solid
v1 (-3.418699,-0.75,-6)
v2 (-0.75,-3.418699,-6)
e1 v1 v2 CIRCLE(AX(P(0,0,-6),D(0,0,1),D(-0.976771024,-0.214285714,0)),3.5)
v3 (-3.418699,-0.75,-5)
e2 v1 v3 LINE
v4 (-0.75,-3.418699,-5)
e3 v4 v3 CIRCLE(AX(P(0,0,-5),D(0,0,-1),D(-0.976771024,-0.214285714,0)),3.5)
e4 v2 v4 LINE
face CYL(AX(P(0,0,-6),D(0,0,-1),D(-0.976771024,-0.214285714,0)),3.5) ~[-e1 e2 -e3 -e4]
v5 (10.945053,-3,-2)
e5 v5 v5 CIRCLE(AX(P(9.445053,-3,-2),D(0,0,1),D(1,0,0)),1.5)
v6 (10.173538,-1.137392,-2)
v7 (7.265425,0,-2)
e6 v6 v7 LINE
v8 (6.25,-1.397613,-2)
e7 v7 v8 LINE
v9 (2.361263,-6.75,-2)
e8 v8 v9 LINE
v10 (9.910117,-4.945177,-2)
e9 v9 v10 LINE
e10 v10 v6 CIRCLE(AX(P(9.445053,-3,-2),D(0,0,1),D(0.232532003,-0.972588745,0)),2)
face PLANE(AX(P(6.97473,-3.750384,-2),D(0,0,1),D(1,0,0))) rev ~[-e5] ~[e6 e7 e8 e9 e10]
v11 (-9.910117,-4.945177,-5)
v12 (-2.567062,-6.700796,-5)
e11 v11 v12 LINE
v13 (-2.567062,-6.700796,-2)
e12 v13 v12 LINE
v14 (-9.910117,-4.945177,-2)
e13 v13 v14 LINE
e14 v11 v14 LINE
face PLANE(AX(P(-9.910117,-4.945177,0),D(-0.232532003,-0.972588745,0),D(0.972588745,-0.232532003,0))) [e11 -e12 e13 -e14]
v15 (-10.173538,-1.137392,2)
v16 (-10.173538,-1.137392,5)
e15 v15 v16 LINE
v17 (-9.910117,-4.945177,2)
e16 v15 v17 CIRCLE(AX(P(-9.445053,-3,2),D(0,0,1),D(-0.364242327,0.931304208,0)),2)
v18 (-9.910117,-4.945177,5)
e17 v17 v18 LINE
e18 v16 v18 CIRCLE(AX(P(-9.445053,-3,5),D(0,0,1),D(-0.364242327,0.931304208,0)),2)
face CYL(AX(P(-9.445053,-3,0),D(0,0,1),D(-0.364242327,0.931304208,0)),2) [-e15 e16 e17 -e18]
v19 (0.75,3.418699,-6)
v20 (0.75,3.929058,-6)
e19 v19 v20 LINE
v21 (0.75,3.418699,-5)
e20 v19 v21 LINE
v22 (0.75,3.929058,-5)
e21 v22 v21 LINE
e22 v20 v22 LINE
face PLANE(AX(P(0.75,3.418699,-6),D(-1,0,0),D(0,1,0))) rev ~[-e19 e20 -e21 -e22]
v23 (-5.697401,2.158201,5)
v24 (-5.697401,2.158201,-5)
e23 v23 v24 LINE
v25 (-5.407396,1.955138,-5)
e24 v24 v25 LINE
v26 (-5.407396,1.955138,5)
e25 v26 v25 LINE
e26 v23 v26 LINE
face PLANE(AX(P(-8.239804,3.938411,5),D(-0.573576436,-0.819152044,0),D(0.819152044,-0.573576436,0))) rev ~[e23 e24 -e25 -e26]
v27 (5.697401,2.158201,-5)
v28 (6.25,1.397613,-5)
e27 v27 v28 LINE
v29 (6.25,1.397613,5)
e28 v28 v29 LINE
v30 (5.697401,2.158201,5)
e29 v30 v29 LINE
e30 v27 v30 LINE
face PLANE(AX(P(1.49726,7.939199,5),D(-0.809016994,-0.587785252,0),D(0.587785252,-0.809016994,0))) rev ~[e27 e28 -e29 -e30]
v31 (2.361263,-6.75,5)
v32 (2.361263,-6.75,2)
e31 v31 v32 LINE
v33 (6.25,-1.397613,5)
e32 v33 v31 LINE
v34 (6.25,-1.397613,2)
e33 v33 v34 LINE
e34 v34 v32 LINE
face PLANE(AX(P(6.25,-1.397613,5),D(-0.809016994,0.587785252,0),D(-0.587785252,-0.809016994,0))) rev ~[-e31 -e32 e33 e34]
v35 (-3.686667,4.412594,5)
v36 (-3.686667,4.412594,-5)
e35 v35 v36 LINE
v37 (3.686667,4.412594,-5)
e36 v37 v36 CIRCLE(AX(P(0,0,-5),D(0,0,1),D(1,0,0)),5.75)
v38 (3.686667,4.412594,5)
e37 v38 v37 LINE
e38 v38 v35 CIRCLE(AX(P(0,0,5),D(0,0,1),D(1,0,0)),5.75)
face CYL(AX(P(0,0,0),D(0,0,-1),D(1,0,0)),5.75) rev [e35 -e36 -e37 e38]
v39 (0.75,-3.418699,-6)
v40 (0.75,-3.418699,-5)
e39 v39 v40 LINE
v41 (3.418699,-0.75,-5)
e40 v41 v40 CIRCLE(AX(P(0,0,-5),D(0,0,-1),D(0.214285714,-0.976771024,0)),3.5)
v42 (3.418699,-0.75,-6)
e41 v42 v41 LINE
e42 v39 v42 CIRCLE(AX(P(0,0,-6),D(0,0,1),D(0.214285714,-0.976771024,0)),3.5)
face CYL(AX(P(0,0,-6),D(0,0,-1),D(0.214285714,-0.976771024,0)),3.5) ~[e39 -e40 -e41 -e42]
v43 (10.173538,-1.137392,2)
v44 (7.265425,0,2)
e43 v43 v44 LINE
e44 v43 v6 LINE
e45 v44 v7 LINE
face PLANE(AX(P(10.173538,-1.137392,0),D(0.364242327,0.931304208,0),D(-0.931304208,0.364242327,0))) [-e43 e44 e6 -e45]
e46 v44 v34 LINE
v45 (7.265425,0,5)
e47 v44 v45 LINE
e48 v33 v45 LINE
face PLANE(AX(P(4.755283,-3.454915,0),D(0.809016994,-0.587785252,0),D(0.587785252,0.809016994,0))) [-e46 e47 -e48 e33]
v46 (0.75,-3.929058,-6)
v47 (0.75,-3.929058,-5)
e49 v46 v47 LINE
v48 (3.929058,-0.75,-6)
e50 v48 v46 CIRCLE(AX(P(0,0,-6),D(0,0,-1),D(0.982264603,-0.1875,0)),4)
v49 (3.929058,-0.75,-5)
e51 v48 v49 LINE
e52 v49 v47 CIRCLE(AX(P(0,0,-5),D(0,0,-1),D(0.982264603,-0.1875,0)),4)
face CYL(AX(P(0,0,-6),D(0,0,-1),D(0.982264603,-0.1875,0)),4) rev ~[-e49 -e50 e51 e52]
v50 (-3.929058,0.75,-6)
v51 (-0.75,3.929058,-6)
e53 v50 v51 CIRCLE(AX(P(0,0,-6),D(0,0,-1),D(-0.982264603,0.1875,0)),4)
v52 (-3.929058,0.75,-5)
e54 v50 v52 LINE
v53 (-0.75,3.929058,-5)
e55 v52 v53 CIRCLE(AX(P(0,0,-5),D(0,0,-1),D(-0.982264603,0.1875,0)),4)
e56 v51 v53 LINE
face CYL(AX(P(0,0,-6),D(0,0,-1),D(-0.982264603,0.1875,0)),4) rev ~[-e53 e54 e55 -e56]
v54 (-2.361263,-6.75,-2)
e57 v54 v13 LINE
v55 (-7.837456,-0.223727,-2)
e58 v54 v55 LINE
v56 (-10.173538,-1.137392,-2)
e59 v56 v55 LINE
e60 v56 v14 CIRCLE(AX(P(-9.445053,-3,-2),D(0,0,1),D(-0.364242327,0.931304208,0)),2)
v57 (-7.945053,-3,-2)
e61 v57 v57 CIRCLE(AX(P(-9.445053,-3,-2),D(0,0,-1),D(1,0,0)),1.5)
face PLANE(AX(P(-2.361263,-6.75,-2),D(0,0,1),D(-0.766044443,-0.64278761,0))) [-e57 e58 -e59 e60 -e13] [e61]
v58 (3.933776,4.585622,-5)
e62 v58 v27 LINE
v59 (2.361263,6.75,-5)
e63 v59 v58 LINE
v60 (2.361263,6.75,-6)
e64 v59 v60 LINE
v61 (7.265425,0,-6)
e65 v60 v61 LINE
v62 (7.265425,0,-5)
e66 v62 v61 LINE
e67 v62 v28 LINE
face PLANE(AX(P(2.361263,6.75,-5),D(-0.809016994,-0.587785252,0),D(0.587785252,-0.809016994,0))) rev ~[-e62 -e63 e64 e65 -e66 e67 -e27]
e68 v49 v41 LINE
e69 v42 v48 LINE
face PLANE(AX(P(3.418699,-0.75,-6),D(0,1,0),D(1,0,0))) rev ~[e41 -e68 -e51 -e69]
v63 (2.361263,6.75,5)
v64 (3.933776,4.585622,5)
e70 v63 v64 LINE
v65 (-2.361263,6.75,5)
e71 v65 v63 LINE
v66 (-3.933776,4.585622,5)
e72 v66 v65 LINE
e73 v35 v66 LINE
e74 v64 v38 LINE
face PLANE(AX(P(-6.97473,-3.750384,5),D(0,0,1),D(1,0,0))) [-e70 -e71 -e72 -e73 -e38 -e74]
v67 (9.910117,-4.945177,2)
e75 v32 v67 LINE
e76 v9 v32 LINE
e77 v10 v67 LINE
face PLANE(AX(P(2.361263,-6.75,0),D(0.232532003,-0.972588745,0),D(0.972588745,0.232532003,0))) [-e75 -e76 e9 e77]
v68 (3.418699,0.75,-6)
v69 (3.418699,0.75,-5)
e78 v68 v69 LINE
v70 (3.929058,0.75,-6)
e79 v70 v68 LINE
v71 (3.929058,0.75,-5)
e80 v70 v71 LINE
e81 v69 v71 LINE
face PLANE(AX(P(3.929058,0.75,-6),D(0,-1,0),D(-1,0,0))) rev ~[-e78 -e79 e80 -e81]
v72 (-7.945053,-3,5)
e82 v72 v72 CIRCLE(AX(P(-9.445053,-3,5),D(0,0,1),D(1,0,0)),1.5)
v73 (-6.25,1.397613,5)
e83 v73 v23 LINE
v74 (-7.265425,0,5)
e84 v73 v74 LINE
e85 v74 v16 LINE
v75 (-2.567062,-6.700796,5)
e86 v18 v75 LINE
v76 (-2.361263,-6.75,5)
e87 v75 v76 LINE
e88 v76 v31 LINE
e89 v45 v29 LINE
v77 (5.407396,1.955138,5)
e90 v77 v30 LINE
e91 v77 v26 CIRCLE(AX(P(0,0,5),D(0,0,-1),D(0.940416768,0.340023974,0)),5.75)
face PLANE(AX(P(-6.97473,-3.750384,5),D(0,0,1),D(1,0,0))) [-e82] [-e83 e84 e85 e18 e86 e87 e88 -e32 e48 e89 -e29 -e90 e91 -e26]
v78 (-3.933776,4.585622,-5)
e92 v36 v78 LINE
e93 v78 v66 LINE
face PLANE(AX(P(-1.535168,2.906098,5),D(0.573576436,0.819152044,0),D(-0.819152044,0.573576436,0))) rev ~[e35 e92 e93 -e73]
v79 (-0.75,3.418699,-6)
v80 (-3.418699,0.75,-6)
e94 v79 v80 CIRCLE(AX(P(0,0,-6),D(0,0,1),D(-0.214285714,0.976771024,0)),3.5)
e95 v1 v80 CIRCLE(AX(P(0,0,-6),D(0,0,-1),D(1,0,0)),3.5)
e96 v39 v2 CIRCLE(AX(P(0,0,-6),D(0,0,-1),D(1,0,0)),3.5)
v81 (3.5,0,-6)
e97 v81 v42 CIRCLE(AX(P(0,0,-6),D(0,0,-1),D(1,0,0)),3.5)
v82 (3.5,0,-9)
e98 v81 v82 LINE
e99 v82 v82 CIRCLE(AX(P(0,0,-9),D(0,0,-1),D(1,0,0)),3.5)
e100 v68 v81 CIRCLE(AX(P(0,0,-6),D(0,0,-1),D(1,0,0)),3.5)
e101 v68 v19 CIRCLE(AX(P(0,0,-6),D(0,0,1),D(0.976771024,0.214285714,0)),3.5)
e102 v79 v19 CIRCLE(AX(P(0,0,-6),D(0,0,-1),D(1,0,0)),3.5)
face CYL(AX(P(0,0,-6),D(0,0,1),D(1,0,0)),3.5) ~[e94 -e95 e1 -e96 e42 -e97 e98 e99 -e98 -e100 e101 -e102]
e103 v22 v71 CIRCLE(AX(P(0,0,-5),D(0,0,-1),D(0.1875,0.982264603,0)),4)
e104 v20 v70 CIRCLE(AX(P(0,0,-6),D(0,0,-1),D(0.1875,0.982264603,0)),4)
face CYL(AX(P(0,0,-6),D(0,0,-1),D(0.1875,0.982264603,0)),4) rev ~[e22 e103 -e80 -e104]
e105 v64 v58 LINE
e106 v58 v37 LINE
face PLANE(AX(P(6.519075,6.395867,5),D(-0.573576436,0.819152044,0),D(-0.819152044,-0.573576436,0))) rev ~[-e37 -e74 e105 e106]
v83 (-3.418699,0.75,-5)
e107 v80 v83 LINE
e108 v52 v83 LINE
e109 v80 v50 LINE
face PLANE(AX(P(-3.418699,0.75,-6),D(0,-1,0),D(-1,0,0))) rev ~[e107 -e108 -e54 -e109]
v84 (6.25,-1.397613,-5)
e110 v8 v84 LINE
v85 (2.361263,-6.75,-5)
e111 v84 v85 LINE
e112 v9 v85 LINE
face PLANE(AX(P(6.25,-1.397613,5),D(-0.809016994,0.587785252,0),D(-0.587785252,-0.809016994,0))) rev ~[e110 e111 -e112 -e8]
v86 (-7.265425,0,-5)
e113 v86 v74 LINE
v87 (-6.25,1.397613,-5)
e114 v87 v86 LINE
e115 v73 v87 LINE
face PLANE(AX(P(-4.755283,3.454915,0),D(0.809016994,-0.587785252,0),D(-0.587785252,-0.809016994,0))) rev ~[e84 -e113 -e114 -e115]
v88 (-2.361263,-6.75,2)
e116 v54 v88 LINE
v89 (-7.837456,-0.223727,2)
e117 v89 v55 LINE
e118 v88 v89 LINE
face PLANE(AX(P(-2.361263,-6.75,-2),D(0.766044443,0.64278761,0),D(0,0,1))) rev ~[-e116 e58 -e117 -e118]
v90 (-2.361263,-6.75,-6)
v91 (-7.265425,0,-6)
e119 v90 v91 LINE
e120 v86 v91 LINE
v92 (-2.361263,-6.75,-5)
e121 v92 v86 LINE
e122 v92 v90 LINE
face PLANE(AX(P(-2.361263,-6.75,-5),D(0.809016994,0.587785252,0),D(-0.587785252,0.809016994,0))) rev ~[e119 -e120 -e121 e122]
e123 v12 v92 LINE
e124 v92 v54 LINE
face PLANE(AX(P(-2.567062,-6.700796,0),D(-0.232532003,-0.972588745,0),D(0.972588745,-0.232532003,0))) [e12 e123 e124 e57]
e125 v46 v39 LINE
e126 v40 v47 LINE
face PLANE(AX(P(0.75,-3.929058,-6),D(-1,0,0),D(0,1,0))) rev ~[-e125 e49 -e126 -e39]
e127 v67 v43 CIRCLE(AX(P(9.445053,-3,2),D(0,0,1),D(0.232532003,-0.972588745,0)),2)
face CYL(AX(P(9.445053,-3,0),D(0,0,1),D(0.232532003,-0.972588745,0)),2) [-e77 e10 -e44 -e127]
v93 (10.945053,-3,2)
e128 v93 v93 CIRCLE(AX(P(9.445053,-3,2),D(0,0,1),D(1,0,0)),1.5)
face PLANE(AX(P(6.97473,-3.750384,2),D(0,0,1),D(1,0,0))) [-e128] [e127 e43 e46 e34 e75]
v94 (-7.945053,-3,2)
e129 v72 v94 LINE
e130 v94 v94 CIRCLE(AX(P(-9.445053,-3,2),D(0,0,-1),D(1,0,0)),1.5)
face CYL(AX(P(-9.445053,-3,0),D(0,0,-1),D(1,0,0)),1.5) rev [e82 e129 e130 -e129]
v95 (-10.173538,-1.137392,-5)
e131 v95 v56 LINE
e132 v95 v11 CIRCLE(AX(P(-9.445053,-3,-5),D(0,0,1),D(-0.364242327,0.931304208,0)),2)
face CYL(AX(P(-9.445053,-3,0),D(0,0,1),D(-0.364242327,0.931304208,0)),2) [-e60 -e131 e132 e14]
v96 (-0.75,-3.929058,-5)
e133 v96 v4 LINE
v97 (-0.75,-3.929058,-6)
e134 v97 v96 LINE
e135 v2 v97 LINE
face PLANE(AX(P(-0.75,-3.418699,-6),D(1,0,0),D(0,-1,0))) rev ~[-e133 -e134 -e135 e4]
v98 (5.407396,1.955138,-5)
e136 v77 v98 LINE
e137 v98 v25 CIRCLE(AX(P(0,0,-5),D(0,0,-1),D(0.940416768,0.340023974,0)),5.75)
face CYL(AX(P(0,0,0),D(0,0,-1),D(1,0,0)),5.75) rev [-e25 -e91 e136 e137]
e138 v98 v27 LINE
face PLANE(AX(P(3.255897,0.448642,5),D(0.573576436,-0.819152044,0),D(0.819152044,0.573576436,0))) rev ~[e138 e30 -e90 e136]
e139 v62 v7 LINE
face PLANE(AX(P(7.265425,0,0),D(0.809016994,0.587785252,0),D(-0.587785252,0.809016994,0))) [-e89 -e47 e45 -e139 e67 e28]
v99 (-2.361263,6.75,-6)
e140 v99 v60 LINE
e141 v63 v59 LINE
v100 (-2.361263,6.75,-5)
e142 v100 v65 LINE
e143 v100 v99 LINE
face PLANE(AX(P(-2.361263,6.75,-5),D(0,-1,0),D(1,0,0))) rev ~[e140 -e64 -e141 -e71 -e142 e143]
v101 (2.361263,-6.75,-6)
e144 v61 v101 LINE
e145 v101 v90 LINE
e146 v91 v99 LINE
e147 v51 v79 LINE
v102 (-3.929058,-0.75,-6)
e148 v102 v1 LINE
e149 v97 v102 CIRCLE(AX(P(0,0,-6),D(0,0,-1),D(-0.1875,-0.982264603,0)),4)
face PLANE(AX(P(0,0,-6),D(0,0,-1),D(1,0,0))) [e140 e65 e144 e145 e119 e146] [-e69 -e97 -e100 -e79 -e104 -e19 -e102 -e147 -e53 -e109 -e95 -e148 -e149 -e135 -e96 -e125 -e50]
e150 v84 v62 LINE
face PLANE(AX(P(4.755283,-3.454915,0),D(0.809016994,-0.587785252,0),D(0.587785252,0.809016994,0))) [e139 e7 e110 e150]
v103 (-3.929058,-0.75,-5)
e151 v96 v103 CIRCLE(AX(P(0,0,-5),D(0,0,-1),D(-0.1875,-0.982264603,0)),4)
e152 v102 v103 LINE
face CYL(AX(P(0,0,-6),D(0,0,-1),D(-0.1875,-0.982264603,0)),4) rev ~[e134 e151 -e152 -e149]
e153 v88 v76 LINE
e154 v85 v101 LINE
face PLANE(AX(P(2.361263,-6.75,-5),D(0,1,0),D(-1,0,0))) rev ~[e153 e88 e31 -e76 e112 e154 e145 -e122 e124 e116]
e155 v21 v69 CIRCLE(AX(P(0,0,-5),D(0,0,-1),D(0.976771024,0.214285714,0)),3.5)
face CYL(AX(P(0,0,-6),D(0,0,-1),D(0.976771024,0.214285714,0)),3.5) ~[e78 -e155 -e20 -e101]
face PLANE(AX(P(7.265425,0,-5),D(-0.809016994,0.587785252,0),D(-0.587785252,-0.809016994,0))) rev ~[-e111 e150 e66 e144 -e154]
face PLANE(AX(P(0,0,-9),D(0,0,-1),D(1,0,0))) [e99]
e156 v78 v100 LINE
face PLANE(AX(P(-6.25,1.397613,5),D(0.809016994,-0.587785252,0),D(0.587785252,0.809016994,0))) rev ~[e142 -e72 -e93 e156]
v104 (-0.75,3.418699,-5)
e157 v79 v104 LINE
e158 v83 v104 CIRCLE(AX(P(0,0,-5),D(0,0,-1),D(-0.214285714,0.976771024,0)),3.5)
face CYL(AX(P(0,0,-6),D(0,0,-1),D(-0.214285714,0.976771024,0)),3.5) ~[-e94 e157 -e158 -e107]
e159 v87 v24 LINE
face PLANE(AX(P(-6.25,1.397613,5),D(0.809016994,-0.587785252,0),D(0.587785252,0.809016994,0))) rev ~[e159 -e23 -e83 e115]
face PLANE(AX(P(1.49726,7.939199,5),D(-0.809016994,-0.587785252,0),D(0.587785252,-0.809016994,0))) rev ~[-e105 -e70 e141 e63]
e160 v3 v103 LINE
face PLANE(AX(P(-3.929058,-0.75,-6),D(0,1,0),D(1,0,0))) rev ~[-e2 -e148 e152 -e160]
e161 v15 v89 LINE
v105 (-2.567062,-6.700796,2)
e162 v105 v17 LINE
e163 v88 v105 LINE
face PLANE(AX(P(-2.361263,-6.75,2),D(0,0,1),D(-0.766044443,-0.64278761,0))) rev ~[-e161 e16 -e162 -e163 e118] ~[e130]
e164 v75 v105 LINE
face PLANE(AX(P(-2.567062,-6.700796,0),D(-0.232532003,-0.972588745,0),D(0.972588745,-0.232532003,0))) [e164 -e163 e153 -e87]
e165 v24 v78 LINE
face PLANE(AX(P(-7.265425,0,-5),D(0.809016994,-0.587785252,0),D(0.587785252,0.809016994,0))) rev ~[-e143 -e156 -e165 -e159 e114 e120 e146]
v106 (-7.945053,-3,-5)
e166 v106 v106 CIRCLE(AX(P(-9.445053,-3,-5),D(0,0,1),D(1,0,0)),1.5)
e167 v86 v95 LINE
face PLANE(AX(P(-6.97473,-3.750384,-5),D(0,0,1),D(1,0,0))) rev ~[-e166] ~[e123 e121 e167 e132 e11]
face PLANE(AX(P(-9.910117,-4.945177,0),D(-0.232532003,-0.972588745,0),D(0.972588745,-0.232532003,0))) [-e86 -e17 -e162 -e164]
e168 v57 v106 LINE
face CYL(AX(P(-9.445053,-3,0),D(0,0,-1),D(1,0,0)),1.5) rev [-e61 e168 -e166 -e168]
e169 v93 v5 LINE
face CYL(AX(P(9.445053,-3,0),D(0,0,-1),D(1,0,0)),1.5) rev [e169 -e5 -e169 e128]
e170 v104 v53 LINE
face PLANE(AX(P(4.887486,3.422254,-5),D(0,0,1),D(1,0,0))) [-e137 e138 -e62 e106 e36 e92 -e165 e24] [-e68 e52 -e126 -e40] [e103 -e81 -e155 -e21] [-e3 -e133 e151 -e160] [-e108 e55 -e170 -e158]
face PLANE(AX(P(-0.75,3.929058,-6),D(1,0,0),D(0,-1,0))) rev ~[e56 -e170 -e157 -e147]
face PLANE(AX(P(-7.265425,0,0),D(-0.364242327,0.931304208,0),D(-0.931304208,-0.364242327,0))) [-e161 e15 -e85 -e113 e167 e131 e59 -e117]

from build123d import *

# Parameters (mm, degrees)
F0_W      = 12.5
F0_H      = 13.5
F0_R      = 5.75
F1_DEPTH  = 5
F3_DEPTH  = 5
F5_DEPTH  = 25
F6_R      = 1.5
F7_DEPTH  = 5
F9_DEPTH  = 1
F10_R     = 1.5
F11_DEPTH = 2
F13_W     = 6.183999799
F13_H     = 4
F14_DEPTH = 25
F17_DEPTH = 10
F20_DEPTH = 25
F21_R     = 3.5
F22_DEPTH = 3


# Not quite as in the source:
# - a feature of the source that left no trace in its solid (it failed there, or was rolled back) is left out
# - a feature names something its author has since deleted; it is built from what else it names


with BuildPart() as f1:
    # F0 (on Top) → F1 (new body, symmetric)
    with BuildSketch(Plane.XY):
        Rectangle(F0_W, F0_H)
        Circle(F0_R, mode=Mode.SUBTRACT)
    extrude(amount=F1_DEPTH, both=True)

    # F2 (on Top) → F3 (join, symmetric)
    with BuildSketch(Plane.XY):
        with BuildLine():
            Line((-4.7552825815, 3.4549150281), (-7.2654252801, 0))
            Line((-7.2654252801, 0), (-4.7552825815, -3.4549150281))
            ThreePointArc((-4.7552825815, -3.4549150281), (-5.8778525229, 0), (-4.7552825815, 3.4549150281))
        make_face()
        with BuildLine():
            Line((4.7552825815, -3.4549150281), (7.2654252801, 0))
            Line((7.2654252801, 0), (4.7552825815, 3.4549150281))
            ThreePointArc((4.7552825815, 3.4549150281), (5.8778525229, 0), (4.7552825815, -3.4549150281))
        make_face()
    extrude(amount=F3_DEPTH, both=True)

    # F4 (on face) → F5 (cut)
    with BuildSketch(Plane.XY.offset(5)):
        Polygon((-8.2530292036, 7.939198947), (-6.25, 1.3976129971), (-1.4972596068, 7.939198947), align=None)
        Polygon((-1.4972596068, -7.939198947), (-6.25, -1.3976129971), (-8.2530292036, -7.939198947), align=None)
        Polygon((8.2530292036, -7.939198947), (6.25, -1.3976129971), (1.4972596068, -7.939198947), align=None)
        Polygon((1.4972596068, 7.939198947), (6.25, 1.3976129971), (8.2530292036, 7.939198947), align=None)
    extrude(amount=-F5_DEPTH, mode=Mode.SUBTRACT)

    # F6 (on Top) → F7 (join, symmetric)
    with BuildSketch(Plane.XY):
        with BuildLine():
            Line((-7.2654252801, 0), (-10.173537518, -1.1373915846))
            ThreePointArc((-10.173537518, -1.1373915846), (-11.4402841733, -3.138029064), (-9.9101168699, -4.9451774907))
            Line((-9.9101168699, -4.9451774907), (-2.5670624157, -6.7007963666))
            Line((-2.5670624157, -6.7007963666), (-2.361263216, -6.75))
            Line((-2.361263216, -6.75), (-7.2654252801, 0))
        make_face()
        with Locations((-9.4450528641, -3)):
            Circle(F6_R, mode=Mode.SUBTRACT)
    extrude(amount=F7_DEPTH, both=True)

    # F8 (on face) → F9 (join)
    with BuildSketch(Plane(origin=(0, 0, -5), x_dir=(1, 0, 0), z_dir=(0, 0, -1))):
        Polygon((2.361263216, -6.75), (7.2654252801, 0), (2.361263216, 6.75), (-2.361263216, 6.75), (-7.2654252801, 0), (-2.361263216, -6.75), align=None)
    extrude(amount=F9_DEPTH)

    # F10 (on Top) → F11 (join, symmetric)
    with BuildSketch(Plane.XY):
        with BuildLine():
            Line((7.2654252801, 0), (2.361263216, -6.75))
            Line((2.361263216, -6.75), (9.9101168699, -4.9451774907))
            ThreePointArc((9.9101168699, -4.9451774907), (11.4402841733, -3.138029064), (10.173537518, -1.1373915846))
            Line((10.173537518, -1.1373915846), (7.2654252801, 0))
        make_face()
        with Locations((9.4450528641, -3)):
            Circle(F10_R, mode=Mode.SUBTRACT)
    extrude(amount=F11_DEPTH, both=True)

    # F13 (on face) → F14 (cut)
    with BuildSketch(Plane(origin=(2.3481090856, -2.7983674386, 0), x_dir=(-0.7660444431, -0.6427876097, 0), z_dir=(-0.6427876097, 0.7660444431, 0))):
        with Locations((9.2396488302, 0)):
            Rectangle(F13_W, F13_H)
    extrude(amount=F14_DEPTH, mode=Mode.SUBTRACT)

    # F16 (on face) → F17 (cut)
    with BuildSketch(Plane.XY.offset(5)):
        Polygon((-6.5190746712, 6.3958671101), (-8.2398039802, 3.9384109772), (-3.2558972089, 0.4486418862), (-1.5351678999, 2.906098019), align=None)
        Polygon((8.2398039802, 3.9384109772), (6.5190746712, 6.3958671101), (1.5351678999, 2.906098019), (3.2558972089, 0.4486418862), align=None)
    extrude(amount=-F17_DEPTH, mode=Mode.SUBTRACT)

    # F19 (on face) → F20 (cut)
    with BuildSketch(Plane(origin=(0, 0, -6), x_dir=(1, 0, 0), z_dir=(0, 0, -1))):
        with BuildLine():
            ThreePointArc((-3.4186985828, 0.75), (-2.4748737342, 2.4748737342), (-0.75, 3.4186985828))
            Line((-0.75, 3.4186985828), (-0.75, 3.9290584114))
            ThreePointArc((-0.75, 3.9290584114), (-2.8284271247, 2.8284271247), (-3.9290584114, 0.75))
            Line((-3.9290584114, 0.75), (-3.4186985828, 0.75))
        make_face()
        with BuildLine():
            Line((0.75, 3.9290584114), (0.75, 3.4186985828))
            ThreePointArc((0.75, 3.4186985828), (2.4748737342, 2.4748737342), (3.4186985828, 0.75))
            Line((3.4186985828, 0.75), (3.9290584114, 0.75))
            ThreePointArc((3.9290584114, 0.75), (2.8284271247, 2.8284271247), (0.75, 3.9290584114))
        make_face()
        with BuildLine():
            Line((-0.75, -3.9290584114), (-0.75, -3.4186985828))
            ThreePointArc((-0.75, -3.4186985828), (-2.4748737342, -2.4748737342), (-3.4186985828, -0.75))
            Line((-3.4186985828, -0.75), (-3.9290584114, -0.75))
            ThreePointArc((-3.9290584114, -0.75), (-2.8284271247, -2.8284271247), (-0.75, -3.9290584114))
        make_face()
        with BuildLine():
            ThreePointArc((3.4186985828, -0.75), (2.4748737342, -2.4748737342), (0.75, -3.4186985828))
            Line((0.75, -3.4186985828), (0.75, -3.9290584114))
            ThreePointArc((0.75, -3.9290584114), (2.8284271247, -2.8284271247), (3.9290584114, -0.75))
            Line((3.9290584114, -0.75), (3.4186985828, -0.75))
        make_face()
    extrude(amount=-F20_DEPTH, mode=Mode.SUBTRACT)

    # F21 (on face) → F22 (join)
    with BuildSketch(Plane(origin=(0, 0, -6), x_dir=(1, 0, 0), z_dir=(0, 0, -1))):
        Circle(F21_R)
    extrude(amount=F22_DEPTH)


solid = f1.part
